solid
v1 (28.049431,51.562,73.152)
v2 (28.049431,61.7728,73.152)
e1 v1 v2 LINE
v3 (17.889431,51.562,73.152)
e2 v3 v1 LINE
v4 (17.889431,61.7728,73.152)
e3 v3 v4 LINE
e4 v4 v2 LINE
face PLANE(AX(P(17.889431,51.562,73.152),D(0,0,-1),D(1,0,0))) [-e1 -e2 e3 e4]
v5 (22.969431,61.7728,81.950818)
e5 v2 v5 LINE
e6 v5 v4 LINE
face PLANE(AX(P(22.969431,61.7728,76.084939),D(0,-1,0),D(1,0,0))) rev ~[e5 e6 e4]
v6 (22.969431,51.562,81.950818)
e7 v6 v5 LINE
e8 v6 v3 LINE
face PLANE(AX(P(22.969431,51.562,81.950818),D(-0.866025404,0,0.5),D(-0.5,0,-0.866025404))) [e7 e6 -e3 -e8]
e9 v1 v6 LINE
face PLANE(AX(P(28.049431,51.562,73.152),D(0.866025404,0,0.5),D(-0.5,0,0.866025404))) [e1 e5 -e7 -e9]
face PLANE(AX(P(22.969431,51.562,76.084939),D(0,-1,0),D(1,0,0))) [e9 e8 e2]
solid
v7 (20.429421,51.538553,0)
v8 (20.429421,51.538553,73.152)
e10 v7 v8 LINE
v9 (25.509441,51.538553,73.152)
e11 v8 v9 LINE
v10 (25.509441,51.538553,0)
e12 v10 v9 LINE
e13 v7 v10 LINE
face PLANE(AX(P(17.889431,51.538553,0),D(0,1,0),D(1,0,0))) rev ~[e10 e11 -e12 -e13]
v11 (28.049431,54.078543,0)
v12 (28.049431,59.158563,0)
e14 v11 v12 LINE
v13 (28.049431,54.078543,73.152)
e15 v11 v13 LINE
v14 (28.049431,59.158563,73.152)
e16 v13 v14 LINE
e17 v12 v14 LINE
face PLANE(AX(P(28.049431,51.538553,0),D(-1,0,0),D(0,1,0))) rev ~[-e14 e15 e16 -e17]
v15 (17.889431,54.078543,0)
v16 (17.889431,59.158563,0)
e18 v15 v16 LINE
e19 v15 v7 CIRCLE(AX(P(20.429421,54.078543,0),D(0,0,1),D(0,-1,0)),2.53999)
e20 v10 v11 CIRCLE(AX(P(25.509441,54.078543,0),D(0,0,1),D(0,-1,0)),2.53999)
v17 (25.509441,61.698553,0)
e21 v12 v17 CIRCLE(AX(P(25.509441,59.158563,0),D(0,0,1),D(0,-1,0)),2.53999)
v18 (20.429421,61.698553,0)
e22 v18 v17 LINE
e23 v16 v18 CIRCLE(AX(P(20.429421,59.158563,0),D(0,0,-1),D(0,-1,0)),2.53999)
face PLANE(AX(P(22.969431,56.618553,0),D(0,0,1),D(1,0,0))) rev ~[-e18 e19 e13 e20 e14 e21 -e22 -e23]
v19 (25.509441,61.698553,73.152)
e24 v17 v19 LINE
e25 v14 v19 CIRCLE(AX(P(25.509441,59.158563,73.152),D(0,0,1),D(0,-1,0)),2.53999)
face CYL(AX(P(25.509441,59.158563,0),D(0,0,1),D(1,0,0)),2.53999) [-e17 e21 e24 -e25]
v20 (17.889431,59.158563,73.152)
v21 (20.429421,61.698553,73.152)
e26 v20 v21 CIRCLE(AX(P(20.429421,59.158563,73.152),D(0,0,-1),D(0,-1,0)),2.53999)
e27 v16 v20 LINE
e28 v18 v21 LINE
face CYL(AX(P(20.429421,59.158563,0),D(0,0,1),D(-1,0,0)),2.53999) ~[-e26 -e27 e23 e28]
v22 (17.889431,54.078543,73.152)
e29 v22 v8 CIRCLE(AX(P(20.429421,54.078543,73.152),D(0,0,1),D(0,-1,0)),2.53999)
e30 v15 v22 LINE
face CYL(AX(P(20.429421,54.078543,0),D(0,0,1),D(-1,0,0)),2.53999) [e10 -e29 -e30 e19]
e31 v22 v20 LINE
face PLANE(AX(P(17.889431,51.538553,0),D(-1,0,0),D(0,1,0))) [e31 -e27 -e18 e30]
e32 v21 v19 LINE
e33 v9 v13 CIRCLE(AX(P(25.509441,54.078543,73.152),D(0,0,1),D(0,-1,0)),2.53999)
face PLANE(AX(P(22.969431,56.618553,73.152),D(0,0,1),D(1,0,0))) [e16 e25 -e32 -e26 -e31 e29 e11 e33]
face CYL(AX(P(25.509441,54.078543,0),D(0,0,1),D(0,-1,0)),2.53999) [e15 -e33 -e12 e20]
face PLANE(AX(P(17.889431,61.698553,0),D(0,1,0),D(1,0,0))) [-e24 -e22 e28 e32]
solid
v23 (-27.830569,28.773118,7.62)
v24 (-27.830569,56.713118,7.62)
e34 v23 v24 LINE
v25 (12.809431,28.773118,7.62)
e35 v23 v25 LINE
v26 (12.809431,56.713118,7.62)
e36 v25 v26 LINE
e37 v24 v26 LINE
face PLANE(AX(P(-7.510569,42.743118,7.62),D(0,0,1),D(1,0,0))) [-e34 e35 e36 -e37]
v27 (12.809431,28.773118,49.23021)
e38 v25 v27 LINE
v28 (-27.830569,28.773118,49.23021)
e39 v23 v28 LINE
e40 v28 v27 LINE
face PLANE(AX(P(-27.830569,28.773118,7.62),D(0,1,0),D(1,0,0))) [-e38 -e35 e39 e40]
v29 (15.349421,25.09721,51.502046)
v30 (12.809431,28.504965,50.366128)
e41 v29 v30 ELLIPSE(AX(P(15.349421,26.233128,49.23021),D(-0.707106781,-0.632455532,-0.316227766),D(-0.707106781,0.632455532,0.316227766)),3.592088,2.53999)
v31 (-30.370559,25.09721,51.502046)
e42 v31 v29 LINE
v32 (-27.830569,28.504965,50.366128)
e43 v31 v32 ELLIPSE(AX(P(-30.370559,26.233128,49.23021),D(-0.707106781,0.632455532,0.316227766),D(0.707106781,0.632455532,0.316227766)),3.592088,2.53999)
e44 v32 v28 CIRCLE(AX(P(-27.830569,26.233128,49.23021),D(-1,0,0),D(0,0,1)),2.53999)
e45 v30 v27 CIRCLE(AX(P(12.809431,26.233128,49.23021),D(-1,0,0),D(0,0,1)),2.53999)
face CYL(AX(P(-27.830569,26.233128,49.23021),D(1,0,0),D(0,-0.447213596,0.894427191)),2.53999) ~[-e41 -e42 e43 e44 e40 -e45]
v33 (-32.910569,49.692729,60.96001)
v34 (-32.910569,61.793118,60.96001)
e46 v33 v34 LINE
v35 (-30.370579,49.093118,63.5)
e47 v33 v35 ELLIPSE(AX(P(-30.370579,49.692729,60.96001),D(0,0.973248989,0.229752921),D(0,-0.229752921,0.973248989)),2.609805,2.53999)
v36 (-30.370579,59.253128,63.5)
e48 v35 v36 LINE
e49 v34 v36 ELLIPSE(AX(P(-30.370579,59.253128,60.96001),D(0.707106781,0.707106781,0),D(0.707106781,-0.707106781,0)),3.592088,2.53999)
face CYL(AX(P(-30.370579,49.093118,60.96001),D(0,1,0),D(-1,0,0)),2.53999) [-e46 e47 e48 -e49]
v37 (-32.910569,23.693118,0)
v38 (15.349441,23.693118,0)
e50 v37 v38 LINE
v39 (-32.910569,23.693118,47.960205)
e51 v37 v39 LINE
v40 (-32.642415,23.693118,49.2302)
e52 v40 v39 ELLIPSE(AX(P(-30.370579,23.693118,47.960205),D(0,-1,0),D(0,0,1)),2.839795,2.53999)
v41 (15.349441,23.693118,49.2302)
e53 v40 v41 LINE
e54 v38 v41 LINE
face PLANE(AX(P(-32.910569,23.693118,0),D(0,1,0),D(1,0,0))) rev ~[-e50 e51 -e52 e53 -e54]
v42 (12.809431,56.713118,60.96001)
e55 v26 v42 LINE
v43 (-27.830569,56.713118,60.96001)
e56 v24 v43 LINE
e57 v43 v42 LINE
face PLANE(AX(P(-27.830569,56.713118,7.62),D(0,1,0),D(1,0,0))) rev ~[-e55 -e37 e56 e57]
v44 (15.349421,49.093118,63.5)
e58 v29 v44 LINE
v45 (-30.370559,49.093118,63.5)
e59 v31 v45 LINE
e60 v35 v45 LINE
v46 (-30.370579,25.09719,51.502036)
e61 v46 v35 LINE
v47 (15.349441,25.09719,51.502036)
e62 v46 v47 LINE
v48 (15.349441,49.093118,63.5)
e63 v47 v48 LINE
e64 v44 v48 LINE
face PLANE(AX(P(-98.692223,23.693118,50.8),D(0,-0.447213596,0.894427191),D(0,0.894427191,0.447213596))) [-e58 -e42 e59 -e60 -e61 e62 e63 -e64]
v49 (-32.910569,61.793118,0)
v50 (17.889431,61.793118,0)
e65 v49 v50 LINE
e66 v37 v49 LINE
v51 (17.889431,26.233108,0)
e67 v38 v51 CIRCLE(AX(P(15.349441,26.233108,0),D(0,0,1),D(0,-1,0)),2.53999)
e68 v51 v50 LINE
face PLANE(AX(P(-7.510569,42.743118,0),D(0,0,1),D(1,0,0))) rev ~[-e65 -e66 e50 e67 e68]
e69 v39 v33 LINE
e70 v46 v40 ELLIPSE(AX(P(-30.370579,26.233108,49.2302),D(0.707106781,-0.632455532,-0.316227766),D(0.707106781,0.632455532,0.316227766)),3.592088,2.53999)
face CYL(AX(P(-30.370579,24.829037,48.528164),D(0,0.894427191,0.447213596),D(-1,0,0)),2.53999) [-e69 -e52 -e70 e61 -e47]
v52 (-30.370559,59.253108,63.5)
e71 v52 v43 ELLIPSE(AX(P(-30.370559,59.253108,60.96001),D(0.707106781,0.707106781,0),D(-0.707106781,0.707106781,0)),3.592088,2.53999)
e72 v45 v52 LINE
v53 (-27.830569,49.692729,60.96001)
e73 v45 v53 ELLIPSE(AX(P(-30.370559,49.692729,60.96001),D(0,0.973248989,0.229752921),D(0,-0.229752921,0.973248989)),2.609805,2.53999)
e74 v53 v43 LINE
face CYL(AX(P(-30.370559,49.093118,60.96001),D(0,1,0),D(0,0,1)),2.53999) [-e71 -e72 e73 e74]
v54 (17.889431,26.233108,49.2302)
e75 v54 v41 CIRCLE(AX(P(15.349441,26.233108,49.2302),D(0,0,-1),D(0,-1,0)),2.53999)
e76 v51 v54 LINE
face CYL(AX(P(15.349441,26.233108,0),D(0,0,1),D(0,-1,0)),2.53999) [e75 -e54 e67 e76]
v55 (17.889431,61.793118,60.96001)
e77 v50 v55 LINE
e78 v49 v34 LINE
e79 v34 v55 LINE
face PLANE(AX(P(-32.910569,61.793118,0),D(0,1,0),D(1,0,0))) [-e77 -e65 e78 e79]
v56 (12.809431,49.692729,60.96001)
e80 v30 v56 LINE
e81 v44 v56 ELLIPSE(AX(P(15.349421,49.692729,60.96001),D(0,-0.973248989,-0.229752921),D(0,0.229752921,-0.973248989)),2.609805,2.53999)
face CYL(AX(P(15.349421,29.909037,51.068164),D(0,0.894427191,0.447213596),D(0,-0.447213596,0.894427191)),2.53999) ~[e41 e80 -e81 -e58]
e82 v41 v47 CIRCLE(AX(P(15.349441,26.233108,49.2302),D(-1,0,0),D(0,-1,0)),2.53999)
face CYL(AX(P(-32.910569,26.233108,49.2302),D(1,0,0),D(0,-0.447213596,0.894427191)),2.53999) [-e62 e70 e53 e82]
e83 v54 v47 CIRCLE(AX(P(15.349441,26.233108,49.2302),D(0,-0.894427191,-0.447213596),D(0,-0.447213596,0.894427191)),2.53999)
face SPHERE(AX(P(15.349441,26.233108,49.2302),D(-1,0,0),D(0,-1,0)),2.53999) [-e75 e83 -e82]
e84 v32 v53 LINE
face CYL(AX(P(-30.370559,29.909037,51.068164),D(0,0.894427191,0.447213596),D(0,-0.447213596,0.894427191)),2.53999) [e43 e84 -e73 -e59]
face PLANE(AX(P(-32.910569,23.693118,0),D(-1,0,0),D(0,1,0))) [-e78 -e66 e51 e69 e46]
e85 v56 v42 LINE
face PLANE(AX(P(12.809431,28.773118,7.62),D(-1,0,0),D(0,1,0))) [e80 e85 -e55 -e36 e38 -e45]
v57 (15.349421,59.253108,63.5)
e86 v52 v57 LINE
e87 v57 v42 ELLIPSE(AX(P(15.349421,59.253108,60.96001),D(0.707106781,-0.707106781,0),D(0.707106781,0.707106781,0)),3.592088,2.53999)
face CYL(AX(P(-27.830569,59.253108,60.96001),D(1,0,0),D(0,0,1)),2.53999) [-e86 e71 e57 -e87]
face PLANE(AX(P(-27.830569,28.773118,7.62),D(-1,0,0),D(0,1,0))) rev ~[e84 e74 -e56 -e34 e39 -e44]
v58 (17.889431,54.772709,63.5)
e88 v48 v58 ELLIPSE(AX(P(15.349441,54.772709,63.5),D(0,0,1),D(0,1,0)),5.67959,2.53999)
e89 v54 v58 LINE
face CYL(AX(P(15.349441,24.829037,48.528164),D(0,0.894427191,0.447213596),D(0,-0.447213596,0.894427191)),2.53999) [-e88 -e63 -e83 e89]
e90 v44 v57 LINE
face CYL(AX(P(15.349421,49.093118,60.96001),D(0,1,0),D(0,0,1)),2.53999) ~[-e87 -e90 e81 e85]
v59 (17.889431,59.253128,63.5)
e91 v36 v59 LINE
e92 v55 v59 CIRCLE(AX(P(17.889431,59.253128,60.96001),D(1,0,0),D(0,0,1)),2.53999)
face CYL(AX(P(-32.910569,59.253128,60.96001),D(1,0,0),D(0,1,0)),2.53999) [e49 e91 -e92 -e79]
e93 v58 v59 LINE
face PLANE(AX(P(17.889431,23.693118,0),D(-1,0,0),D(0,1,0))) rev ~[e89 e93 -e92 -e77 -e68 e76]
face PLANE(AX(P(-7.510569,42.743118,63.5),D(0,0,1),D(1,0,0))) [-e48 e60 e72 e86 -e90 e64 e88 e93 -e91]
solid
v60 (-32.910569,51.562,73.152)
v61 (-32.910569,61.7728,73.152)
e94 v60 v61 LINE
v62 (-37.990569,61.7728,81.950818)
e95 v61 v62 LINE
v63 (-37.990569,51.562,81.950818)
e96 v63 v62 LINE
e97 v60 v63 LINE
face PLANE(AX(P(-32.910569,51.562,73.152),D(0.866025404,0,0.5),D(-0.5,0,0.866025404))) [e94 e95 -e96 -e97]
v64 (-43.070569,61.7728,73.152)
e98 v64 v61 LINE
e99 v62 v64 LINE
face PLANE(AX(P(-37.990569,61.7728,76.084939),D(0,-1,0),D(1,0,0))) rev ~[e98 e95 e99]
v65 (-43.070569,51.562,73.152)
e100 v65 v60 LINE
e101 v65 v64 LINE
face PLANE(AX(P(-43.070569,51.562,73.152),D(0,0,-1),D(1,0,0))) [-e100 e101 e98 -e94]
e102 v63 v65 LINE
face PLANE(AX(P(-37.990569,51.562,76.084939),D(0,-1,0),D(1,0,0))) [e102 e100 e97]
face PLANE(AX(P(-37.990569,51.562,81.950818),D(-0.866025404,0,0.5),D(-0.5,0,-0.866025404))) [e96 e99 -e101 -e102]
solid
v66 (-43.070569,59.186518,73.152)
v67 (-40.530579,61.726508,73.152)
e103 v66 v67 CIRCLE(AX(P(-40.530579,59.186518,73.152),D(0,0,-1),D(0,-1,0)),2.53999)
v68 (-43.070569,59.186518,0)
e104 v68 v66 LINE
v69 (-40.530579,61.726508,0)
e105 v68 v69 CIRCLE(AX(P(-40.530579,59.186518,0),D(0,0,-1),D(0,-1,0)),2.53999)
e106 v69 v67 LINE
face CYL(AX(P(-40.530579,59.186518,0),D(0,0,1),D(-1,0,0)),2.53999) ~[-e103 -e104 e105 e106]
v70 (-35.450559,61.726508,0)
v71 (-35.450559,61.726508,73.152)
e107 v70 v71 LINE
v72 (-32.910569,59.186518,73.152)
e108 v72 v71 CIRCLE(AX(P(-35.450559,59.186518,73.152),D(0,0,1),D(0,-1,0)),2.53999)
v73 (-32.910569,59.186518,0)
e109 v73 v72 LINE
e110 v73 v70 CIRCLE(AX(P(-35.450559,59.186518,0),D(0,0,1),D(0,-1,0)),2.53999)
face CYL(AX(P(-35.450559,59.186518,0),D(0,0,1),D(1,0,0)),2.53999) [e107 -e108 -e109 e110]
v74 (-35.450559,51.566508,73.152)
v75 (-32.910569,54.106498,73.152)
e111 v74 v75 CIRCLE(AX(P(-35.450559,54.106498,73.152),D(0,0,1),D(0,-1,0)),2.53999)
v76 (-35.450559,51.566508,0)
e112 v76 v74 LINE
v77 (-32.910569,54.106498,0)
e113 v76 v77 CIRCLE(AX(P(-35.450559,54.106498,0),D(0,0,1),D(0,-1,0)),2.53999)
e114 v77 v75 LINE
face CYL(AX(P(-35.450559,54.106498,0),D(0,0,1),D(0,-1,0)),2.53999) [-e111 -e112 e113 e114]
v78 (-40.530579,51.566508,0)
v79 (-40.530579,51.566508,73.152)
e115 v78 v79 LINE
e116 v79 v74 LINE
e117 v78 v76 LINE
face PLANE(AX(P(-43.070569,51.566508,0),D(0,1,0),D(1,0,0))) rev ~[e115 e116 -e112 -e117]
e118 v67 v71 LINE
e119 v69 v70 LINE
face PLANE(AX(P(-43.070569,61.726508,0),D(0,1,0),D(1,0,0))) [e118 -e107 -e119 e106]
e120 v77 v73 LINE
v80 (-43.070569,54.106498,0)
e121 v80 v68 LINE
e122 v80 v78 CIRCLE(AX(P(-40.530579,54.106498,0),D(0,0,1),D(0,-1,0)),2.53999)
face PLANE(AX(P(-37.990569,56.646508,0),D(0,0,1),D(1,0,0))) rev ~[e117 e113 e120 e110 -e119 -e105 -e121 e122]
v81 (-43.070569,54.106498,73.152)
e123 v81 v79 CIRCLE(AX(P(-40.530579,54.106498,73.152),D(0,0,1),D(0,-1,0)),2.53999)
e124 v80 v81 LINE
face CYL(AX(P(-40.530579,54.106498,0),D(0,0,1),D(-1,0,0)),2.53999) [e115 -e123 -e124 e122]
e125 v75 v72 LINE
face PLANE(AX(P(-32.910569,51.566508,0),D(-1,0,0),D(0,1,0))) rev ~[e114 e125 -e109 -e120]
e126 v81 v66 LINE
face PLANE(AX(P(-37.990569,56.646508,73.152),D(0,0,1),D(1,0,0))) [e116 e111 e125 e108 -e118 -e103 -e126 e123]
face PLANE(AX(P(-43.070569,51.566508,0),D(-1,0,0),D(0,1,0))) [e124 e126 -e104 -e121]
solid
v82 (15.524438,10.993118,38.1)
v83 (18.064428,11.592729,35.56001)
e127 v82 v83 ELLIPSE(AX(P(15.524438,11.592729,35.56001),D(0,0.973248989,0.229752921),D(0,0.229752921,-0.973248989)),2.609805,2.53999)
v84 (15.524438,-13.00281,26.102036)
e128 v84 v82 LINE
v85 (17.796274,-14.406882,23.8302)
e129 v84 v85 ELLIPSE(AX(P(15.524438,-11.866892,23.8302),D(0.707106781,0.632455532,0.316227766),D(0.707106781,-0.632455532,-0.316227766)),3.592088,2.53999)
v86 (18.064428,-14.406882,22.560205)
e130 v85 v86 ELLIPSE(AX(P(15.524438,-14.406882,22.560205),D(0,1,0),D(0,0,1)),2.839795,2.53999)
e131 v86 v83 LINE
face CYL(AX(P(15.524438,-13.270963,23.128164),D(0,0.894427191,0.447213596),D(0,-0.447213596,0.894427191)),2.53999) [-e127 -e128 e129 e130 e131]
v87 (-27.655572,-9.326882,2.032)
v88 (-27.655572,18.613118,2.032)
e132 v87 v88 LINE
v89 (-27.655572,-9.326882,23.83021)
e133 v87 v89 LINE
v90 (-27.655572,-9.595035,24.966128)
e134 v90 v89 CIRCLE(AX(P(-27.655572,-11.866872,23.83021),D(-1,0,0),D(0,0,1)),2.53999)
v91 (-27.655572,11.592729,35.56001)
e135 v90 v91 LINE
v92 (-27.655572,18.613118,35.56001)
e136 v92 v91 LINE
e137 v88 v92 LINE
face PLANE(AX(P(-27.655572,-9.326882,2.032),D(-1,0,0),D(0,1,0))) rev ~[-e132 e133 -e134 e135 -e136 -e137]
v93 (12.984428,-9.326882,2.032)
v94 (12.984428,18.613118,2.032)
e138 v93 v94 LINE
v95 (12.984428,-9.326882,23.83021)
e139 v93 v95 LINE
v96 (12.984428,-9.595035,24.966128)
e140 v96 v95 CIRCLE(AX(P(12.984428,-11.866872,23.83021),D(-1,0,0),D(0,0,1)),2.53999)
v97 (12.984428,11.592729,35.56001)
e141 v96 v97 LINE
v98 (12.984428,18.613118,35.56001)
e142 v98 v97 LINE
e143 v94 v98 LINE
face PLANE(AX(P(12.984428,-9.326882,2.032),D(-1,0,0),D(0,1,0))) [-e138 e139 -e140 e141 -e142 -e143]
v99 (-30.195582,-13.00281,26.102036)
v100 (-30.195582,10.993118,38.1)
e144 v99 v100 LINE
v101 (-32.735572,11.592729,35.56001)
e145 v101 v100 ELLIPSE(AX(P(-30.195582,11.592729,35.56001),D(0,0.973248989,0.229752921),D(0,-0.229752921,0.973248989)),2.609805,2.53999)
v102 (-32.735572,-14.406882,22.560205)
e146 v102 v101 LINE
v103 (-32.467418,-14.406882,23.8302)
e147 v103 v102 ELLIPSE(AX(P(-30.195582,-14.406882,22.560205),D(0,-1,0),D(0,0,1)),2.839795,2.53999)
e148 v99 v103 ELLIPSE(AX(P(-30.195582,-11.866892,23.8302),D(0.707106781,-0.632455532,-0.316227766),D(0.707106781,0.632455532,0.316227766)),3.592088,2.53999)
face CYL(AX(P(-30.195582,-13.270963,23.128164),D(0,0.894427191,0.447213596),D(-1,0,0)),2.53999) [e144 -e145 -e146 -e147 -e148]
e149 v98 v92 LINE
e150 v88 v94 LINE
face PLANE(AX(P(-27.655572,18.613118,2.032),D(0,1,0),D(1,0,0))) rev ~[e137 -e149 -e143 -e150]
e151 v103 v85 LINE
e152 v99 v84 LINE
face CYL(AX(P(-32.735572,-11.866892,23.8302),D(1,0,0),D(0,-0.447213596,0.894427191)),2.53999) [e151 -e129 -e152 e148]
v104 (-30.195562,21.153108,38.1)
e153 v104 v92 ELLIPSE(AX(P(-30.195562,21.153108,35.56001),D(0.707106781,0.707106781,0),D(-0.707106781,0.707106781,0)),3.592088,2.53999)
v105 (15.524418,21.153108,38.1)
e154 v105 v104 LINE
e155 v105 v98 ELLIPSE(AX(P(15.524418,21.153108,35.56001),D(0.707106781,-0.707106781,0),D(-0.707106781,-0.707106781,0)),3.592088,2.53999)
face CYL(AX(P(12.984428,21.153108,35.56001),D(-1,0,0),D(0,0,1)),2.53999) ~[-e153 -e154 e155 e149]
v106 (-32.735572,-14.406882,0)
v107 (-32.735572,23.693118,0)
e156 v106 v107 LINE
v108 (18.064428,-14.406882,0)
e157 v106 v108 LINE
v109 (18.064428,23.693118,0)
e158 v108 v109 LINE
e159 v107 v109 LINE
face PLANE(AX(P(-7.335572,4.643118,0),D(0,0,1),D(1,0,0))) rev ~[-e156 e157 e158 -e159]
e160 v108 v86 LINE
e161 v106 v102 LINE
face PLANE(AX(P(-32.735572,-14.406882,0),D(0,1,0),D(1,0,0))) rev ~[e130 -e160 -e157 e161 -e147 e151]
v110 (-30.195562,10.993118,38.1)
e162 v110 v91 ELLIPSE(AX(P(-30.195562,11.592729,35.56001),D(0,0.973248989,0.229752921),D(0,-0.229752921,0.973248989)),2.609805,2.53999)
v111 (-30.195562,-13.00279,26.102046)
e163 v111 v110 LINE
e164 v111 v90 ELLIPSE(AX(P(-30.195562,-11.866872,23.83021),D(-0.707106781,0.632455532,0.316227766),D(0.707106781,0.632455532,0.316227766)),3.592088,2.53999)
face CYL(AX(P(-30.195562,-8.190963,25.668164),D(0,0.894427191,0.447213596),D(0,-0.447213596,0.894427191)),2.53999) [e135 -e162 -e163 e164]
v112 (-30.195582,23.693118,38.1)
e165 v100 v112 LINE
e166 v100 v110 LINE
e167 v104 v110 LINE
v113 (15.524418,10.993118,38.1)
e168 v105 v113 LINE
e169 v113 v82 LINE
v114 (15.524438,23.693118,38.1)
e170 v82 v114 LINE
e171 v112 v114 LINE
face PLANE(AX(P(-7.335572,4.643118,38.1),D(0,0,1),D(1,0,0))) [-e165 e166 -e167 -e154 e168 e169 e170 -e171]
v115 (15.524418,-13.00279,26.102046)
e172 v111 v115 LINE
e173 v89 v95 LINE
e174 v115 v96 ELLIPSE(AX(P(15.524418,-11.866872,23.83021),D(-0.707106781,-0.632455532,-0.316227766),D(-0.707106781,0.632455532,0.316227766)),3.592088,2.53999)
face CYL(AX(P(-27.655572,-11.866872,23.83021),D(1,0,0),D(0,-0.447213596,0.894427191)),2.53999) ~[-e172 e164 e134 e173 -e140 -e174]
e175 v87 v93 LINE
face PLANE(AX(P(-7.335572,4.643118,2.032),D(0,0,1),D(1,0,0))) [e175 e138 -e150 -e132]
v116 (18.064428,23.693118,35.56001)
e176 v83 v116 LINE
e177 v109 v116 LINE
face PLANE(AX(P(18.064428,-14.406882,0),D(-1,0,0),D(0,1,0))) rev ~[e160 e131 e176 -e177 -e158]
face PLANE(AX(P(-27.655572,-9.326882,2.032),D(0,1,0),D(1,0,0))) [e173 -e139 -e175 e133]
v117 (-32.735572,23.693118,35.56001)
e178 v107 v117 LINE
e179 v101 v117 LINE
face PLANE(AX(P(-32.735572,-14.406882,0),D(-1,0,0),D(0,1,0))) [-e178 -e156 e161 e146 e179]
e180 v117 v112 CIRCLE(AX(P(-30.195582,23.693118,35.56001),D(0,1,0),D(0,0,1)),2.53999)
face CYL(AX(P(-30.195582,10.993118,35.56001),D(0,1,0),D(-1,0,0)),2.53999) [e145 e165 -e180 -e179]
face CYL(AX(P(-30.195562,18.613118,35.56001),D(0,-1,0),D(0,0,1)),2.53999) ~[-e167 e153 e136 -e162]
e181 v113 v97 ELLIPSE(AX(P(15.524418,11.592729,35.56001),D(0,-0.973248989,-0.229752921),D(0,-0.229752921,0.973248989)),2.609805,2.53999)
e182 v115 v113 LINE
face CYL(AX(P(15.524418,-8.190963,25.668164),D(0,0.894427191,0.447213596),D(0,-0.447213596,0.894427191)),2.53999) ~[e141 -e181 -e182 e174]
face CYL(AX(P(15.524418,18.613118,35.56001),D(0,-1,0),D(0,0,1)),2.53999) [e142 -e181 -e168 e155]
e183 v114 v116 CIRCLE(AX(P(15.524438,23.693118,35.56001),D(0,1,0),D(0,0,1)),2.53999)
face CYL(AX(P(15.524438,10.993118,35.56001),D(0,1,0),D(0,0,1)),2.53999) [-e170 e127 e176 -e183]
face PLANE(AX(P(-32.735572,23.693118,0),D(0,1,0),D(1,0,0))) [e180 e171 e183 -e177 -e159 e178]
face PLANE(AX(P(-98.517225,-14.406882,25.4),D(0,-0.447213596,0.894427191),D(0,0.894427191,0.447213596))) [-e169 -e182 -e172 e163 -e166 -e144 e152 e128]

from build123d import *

# Parameters (mm, degrees)
F0_W           = 50.8
F0_H           = 38.1
F4_DEPTH       = 63.5
F1_W           = 50.8
F1_H           = 38.1
F5_DEPTH       = 38.1
F6_START       = 7.62
F2_W           = 40.64
F2_H           = 27.94
F6_DEPTH       = 55.88
F7_START       = 2.032
F3_W           = 40.64
F3_H           = 27.94
F7_DEPTH       = 59.182
F8_W           = 10.16
F8_H           = 10.16
F9_DEPTH       = 73.152
F11_START      = -51.562
F11_DEPTH      = 10.2108
F12_T1_DEPTH   = 182.3633067884
F12_2_T1_DEPTH = 182.3633067884
F13_R          = 2.53999
F13_2_R        = 2.53999
F13_3_R        = 2.53999
F13_4_R        = 2.53999


# Not quite as in the source:
# - a fillet or chamfer that OpenCascade refuses, or shapes differently, is made with other operations: its cross-section is extruded or revolved along the edge and cut away or added
# - a fillet or chamfer is up to 0.001 mm smaller than in the source, because OpenCascade refuses the exact size


with BuildPart() as f4:
    # F0 (on Top) → F4 (new body)
    with BuildSketch(Plane.XY):
        with Locations((-7.5105691367, 42.7431184798)):
            Rectangle(F0_W, F0_H)
    extrude(amount=F4_DEPTH)

    # F2 (on Top) → F6 (cut)
    with BuildSketch(Plane.XY.offset(F6_START)):
        with Locations((-7.5105691367, 42.7431184798)):
            Rectangle(F2_W, F2_H)
    extrude(amount=F6_DEPTH, mode=Mode.SUBTRACT)

    # F12: chamfer of 25.4 x 12.7 on 1 edges, made by hand

    # F12_s2 → F12_t1 (cut)
    with BuildSketch(Plane.YZ.offset(-98.6922225309)):
        Polygon((23.6931184798, 50.8), (49.0931184798, 63.5), (23.6931184798, 63.5), align=None)
    extrude(amount=F12_T1_DEPTH, mode=Mode.SUBTRACT)

    # F13 (radius 2.54 in the source; OpenCascade refuses exactly that, so slightly less here)
    f13_edges = [f4.edges().sort_by_distance(p)[0] for p in [
        (-7.510569, 28.773118, 53.34),
        (-27.830569, 38.933118, 58.42),
        (-27.830569, 52.903118, 63.5),
        (-7.510569, 56.713118, 63.5),
        (12.809431, 52.903118, 63.5),
        (12.809431, 38.933118, 58.42),
        (-32.910569, 36.393118, 57.15),
        (-7.510569, 61.793118, 63.5),
        (17.889431, 36.393118, 57.15),
        (-7.510569, 23.693118, 50.8),
        (-32.910569, 55.443118, 63.5),
        (17.889431, 23.693118, 25.4),
    ]]
    fillet(f13_edges, radius=F13_R)


with BuildPart() as f5:
    # F1 (on Top) → F5 (new body)
    with BuildSketch(Plane.XY):
        with Locations((-7.3355720048, 4.6431184798)):
            Rectangle(F1_W, F1_H)
    extrude(amount=F5_DEPTH)

    # F3 (on Top) → F7 (cut)
    with BuildSketch(Plane.XY.offset(F7_START)):
        with Locations((-7.3355720048, 4.6431184798)):
            Rectangle(F3_W, F3_H)
    extrude(amount=F7_DEPTH, mode=Mode.SUBTRACT)

    # F12#2: chamfer of 25.4 x 12.7 on 1 edges, made by hand

    # F12_2_s2 → F12_2_t1 (cut)
    with BuildSketch(Plane.YZ.offset(-98.517225399)):
        Polygon((-14.4068815202, 25.4), (10.9931184798, 38.1), (-14.4068815202, 38.1), align=None)
    extrude(amount=F12_2_T1_DEPTH, mode=Mode.SUBTRACT)

    # F13#2 (radius 2.54 in the source; OpenCascade refuses exactly that, so slightly less here)
    f13_2_edges = [f5.edges().sort_by_distance(p)[0] for p in [
        (-7.335572, 18.613118, 38.1),
        (-27.655572, 14.803118, 38.1),
        (-27.655572, 0.833118, 33.02),
        (12.984428, 0.833118, 33.02),
        (12.984428, 14.803118, 38.1),
        (-7.335572, -9.326882, 27.94),
        (18.064428, 17.343118, 38.1),
        (18.064428, -1.706882, 31.75),
        (-7.335572, -14.406882, 25.4),
        (-32.735572, -1.706882, 31.75),
        (-32.735572, 17.343118, 38.1),
    ]]
    fillet(f13_2_edges, radius=F13_2_R)


with BuildPart() as f9:
    # F8 (on Top) → F9 (new body)
    with BuildSketch(Plane.XY):
        with Locations((-37.9905691367, 56.6465079886)):
            Rectangle(F8_W, F8_H)
    extrude(amount=F9_DEPTH)

    # F13#3 (radius 2.54 in the source; OpenCascade refuses exactly that, so slightly less here)
    f13_3_edges = [f9.edges().sort_by_distance(p)[0] for p in [
        (-43.070569, 51.566508, 36.576),
        (-43.070569, 61.726508, 36.576),
        (-32.910569, 61.726508, 36.576),
        (-32.910569, 51.566508, 36.576),
    ]]
    fillet(f13_3_edges, radius=F13_3_R)


with BuildPart() as f9b:
    # F8 (on Top) → F9, piece 2 (new body)
    with BuildSketch(Plane.XY):
        with Locations((22.9694308633, 56.6185530889)):
            Rectangle(F8_W, F8_H)
    extrude(amount=F9_DEPTH)

    # F13#4 (radius 2.54 in the source; OpenCascade refuses exactly that, so slightly less here)
    f13_4_edges = [f9b.edges().sort_by_distance(p)[0] for p in [
        (28.049431, 61.698553, 36.576),
        (17.889431, 51.538553, 36.576),
        (28.049431, 51.538553, 36.576),
        (17.889431, 61.698553, 36.576),
    ]]
    fillet(f13_4_edges, radius=F13_4_R)


with BuildPart() as f11:
    # F10 (on Front) → F11 (new body)
    with BuildSketch(Plane.XZ.offset(F11_START)):
        Polygon((-37.9905691367, 81.9508181024), (-43.0705691367, 73.152), (-32.9105691367, 73.152), align=None)
    extrude(amount=-F11_DEPTH)


with BuildPart() as f11b:
    # F10 (on Front) → F11, piece 2 (new body)
    with BuildSketch(Plane.XZ.offset(F11_START)):
        Polygon((22.9694308633, 81.9508181024), (17.8894308633, 73.152), (28.0494308633, 73.152), align=None)
    extrude(amount=-F11_DEPTH)


solid = Compound([f4.part, f5.part, f9.part, f9b.part, f11.part, f11b.part])
